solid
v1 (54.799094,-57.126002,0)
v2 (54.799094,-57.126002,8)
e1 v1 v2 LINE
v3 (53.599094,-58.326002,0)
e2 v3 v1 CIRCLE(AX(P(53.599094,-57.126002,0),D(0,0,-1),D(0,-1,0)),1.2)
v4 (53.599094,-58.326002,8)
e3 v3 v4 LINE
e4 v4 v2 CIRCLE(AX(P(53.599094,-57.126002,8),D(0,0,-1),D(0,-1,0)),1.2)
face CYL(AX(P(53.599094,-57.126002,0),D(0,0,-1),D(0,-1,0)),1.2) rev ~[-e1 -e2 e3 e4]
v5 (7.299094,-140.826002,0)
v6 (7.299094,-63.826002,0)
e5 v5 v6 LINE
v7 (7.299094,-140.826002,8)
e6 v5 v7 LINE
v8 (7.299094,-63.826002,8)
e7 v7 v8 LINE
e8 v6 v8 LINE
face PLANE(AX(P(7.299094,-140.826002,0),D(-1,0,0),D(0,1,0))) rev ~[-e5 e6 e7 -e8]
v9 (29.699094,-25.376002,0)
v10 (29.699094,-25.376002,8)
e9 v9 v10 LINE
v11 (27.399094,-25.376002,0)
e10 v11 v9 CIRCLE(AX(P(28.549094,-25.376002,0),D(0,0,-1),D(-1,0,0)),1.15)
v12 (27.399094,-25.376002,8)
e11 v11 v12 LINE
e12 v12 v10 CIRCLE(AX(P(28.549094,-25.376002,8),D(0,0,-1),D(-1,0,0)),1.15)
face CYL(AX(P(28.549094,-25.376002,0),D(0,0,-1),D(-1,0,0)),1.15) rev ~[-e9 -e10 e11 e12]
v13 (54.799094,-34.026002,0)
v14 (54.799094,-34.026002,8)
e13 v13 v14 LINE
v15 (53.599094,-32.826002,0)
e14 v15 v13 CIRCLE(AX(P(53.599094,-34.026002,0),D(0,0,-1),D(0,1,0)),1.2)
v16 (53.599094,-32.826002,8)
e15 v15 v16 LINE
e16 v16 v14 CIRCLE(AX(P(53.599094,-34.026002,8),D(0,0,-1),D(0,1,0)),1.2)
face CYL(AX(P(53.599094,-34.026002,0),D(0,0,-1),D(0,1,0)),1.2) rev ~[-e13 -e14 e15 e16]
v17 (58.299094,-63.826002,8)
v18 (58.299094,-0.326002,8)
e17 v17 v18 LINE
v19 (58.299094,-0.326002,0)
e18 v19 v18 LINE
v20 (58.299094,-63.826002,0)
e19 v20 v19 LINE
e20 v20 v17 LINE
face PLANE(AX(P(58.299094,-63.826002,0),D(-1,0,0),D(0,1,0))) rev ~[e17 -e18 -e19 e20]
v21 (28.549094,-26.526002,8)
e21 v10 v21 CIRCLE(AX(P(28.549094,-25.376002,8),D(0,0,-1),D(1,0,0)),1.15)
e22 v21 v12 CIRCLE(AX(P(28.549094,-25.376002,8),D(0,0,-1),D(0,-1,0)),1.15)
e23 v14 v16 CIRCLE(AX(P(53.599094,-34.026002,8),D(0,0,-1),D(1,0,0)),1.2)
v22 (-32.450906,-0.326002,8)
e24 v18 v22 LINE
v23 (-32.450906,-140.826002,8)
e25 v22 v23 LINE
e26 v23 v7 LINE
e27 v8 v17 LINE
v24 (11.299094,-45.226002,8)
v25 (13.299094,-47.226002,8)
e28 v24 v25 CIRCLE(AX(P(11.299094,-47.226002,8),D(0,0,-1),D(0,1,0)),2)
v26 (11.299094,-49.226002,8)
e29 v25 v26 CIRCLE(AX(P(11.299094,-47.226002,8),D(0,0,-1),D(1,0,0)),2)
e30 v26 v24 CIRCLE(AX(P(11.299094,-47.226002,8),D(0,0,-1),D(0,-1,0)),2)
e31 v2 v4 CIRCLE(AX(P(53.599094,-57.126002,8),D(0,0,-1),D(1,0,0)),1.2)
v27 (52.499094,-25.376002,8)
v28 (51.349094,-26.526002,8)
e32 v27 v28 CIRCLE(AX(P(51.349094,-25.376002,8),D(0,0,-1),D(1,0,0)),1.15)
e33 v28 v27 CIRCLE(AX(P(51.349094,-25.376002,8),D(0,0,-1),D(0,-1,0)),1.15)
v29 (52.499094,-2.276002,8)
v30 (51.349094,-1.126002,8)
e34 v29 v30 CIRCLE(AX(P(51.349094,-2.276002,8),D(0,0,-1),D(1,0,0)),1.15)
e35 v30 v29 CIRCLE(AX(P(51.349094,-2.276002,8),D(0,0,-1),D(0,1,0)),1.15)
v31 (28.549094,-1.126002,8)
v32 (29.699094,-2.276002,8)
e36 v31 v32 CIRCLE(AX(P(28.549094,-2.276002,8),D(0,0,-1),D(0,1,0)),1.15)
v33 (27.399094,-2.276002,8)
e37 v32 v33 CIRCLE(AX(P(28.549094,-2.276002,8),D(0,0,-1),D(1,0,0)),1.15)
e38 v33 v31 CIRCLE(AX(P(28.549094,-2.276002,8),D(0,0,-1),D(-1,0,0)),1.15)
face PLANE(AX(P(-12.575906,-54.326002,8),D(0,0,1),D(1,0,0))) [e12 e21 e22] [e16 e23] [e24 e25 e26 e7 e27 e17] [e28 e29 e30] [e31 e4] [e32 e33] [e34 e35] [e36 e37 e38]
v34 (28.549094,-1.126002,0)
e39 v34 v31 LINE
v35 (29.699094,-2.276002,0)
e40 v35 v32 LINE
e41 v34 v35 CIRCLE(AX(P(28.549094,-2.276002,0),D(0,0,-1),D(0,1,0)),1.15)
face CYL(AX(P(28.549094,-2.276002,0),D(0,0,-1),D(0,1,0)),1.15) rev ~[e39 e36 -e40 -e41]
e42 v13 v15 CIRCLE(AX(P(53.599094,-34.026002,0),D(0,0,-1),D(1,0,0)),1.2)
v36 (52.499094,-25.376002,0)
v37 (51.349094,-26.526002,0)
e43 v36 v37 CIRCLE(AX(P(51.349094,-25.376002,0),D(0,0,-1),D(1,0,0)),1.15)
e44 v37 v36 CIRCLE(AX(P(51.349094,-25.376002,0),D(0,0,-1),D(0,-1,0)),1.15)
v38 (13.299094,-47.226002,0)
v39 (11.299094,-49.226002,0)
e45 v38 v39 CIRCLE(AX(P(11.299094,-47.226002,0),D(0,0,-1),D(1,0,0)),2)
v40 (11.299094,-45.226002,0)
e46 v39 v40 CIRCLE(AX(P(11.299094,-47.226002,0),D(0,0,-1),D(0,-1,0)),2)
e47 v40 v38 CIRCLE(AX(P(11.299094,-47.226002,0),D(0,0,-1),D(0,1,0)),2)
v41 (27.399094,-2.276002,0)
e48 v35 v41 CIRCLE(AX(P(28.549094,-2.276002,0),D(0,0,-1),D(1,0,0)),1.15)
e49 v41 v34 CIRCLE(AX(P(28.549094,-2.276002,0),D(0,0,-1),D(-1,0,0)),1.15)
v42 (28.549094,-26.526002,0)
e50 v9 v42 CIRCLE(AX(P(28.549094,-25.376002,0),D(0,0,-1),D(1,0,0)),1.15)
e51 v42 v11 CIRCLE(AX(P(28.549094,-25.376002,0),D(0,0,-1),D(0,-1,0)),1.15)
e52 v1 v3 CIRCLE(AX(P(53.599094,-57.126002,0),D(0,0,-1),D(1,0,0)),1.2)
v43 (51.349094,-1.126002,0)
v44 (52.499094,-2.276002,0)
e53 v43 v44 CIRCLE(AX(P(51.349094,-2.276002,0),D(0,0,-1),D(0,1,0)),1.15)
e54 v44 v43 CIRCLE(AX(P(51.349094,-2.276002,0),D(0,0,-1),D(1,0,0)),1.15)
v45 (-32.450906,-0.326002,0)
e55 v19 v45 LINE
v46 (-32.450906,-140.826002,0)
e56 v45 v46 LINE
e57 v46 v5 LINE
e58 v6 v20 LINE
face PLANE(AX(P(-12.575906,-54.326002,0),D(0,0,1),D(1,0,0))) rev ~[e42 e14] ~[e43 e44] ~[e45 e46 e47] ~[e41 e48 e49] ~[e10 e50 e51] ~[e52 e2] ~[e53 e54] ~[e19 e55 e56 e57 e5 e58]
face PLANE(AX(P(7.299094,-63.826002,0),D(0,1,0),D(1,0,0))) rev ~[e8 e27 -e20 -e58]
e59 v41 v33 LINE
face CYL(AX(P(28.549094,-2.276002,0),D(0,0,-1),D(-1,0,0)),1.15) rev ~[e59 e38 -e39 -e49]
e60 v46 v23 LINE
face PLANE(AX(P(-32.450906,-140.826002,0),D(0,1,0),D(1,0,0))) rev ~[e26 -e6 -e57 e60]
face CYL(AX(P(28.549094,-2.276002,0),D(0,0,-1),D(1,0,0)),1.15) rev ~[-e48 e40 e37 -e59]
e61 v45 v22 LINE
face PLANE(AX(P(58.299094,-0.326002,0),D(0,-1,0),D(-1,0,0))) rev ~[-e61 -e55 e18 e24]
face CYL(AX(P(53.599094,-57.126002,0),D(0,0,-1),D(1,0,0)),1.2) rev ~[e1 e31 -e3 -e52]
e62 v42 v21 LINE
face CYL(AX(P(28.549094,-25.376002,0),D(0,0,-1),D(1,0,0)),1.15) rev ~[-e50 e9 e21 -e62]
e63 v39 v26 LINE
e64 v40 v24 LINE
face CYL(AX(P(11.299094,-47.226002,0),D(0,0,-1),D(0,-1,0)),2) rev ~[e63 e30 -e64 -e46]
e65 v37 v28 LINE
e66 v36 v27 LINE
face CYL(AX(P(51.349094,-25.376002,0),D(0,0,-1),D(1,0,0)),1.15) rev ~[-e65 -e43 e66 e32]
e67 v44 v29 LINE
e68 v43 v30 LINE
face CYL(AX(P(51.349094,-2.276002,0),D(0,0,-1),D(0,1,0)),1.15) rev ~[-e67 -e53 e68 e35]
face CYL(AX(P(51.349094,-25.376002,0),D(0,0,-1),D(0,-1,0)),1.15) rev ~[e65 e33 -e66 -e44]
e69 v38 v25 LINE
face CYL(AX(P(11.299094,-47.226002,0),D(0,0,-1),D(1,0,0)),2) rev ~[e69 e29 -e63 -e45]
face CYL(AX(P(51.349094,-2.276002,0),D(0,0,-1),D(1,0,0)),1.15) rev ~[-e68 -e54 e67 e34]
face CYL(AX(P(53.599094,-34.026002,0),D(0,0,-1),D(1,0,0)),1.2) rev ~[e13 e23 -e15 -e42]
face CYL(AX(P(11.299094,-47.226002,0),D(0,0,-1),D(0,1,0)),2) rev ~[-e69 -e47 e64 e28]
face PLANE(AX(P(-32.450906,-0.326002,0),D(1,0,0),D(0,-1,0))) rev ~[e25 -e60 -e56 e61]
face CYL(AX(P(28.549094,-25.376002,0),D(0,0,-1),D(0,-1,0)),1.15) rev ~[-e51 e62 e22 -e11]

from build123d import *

# Parameters (mm, degrees)
F0_W     = 39.75
F0_H     = 5
F0_W_2   = 4
F0_H_2   = 9
F0_H_3   = 77
F0_W_3   = 3
F0_H_4   = 26.5
F0_H_5   = 1.95
F0_W_4   = 5
F0_H_6   = 17
F0_H_7   = 23.1
F1_DEPTH = 8


with BuildPart() as f1:
    # F0 (on Top) → F1 (new body)
    with BuildSketch(Plane.XY):
        Polygon((-32.4509056807, -49.8260023594), (-32.4509056807, -58.8260023594), (7.2990943193, -58.8260023594), (7.2990943193, -49.8260023594), (-26.0348562151, -49.8260023594), align=None)
        with Locations((-12.5759056807, -61.3260023594)):
            Rectangle(F0_W, F0_H)
        with Locations((9.2990943193, -54.3260023594)):
            Rectangle(F0_W_2, F0_H_2)
        Polygon((11.2990943193, -58.8260023594), (7.2990943193, -58.8260023594), (7.2990943193, -63.8260023594), (14.2990943193, -63.8260023594), (19.2990943193, -63.8260023594), (58.2990943193, -63.8260023594), (58.2990943193, -22.3260023594), (53.2990943193, -22.3260023594), (53.2990943193, -25.3760023594), (53.2990943193, -27.3260023594), (51.3490943193, -27.3260023594), (28.5490943193, -27.3260023594), (23.2990943193, -27.3260023594), (23.2990943193, -32.3260023594), (53.5990943193, -32.3260023594), (55.2990943193, -32.3260023594), (55.2990943193, -34.0260023594), (55.2990943193, -57.1260023594), (55.2990943193, -58.8260023594), (53.5990943193, -58.8260023594), (23.2990943193, -58.8260023594), (19.2990943193, -58.8260023594), (14.2990943193, -58.8260023594), align=None)
        with BuildLine():
            Line((-32.4509056807, -0.3260023594), (-32.4509056807, -49.8260023594))
            Line((-32.4509056807, -49.8260023594), (-26.0348562151, -49.8260023594))
            Line((-26.0348562151, -49.8260023594), (7.2990943193, -49.8260023594))
            Line((7.2990943193, -49.8260023594), (11.2990943193, -49.8260023594))
            Line((11.2990943193, -49.8260023594), (11.2990943193, -49.2260023594))
            ThreePointArc((11.2990943193, -49.2260023594), (9.2990943193, -47.2260023594), (11.2990943193, -45.2260023594))
            Line((11.2990943193, -45.2260023594), (11.2990943193, -0.3260023594))
            Line((11.2990943193, -0.3260023594), (-32.4509056807, -0.3260023594))
        make_face()
        with Locations((-12.5759056807, -102.3260023594)):
            Rectangle(F0_W, F0_H_3)
        with Locations((12.7990943193, -54.3260023594)):
            Rectangle(F0_W_3, F0_H_2)
        Polygon((14.2990943193, -49.8260023594), (14.2990943193, -58.8260023594), (19.2990943193, -58.8260023594), (19.2990943193, -32.3260023594), (23.2990943193, -32.3260023594), (23.2990943193, -27.3260023594), (19.2990943193, -27.3260023594), (19.2990943193, -25.3760023594), (19.2990943193, -2.2760023594), (19.2990943193, -0.3260023594), (14.2990943193, -0.3260023594), (14.2990943193, -27.3260023594), (14.2990943193, -32.3260023594), (14.2990943193, -47.2260023594), align=None)
        with BuildLine():
            Line((11.2990943193, -49.2260023594), (11.2990943193, -49.8260023594))
            Line((11.2990943193, -49.8260023594), (14.2990943193, -49.8260023594))
            Line((14.2990943193, -49.8260023594), (14.2990943193, -47.2260023594))
            Line((14.2990943193, -47.2260023594), (13.2990943193, -47.2260023594))
            ThreePointArc((13.2990943193, -47.2260023594), (12.7133078817, -48.6402159218), (11.2990943193, -49.2260023594))
        make_face()
        with BuildLine():
            Line((14.2990943193, -0.3260023594), (11.2990943193, -0.3260023594))
            Line((11.2990943193, -0.3260023594), (11.2990943193, -45.2260023594))
            ThreePointArc((11.2990943193, -45.2260023594), (12.7133078817, -45.811788797), (13.2990943193, -47.2260023594))
            Line((13.2990943193, -47.2260023594), (14.2990943193, -47.2260023594))
            Line((14.2990943193, -47.2260023594), (14.2990943193, -32.3260023594))
            Line((14.2990943193, -32.3260023594), (14.2990943193, -27.3260023594))
            Line((14.2990943193, -27.3260023594), (14.2990943193, -0.3260023594))
        make_face()
        with Locations((21.2990943193, -45.5760023594)):
            Rectangle(F0_W_2, F0_H_4)
        with BuildLine():
            Line((23.2990943193, -32.3260023594), (23.2990943193, -58.8260023594))
            Line((23.2990943193, -58.8260023594), (53.5990943193, -58.8260023594))
            Line((53.5990943193, -58.8260023594), (53.5990943193, -58.3260023594))
            ThreePointArc((53.5990943193, -58.3260023594), (52.7505661819, -56.277474222), (54.7990943193, -57.1260023594))
            Line((54.7990943193, -57.1260023594), (55.2990943193, -57.1260023594))
            Line((55.2990943193, -57.1260023594), (55.2990943193, -34.0260023594))
            Line((55.2990943193, -34.0260023594), (54.7990943193, -34.0260023594))
            ThreePointArc((54.7990943193, -34.0260023594), (52.7505661819, -34.8745304968), (53.5990943193, -32.8260023594))
            Line((53.5990943193, -32.8260023594), (53.5990943193, -32.3260023594))
            Line((53.5990943193, -32.3260023594), (23.2990943193, -32.3260023594))
        make_face()
        with Locations((21.2990943193, -1.3010023594)):
            Rectangle(F0_W_2, F0_H_5)
        with BuildLine():
            Line((53.5990943193, -58.3260023594), (53.5990943193, -58.8260023594))
            Line((53.5990943193, -58.8260023594), (55.2990943193, -58.8260023594))
            Line((55.2990943193, -58.8260023594), (55.2990943193, -57.1260023594))
            Line((55.2990943193, -57.1260023594), (54.7990943193, -57.1260023594))
            ThreePointArc((54.7990943193, -57.1260023594), (54.4476224568, -57.9745304968), (53.5990943193, -58.3260023594))
        make_face()
        with Locations((55.7990943193, -13.8260023594)):
            Rectangle(F0_W_4, F0_H_6)
        with BuildLine():
            Line((28.5490943193, -0.3260023594), (23.2990943193, -0.3260023594))
            Line((23.2990943193, -0.3260023594), (23.2990943193, -2.2760023594))
            Line((23.2990943193, -2.2760023594), (27.3990943193, -2.2760023594))
            ThreePointArc((27.3990943193, -2.2760023594), (27.735921521, -1.462829561), (28.5490943193, -1.1260023594))
            Line((28.5490943193, -1.1260023594), (28.5490943193, -0.3260023594))
        make_face()
        with Locations((21.2990943193, -13.8260023594)):
            Rectangle(F0_W_2, F0_H_7)
        with BuildLine():
            Line((55.2990943193, -32.3260023594), (53.5990943193, -32.3260023594))
            Line((53.5990943193, -32.3260023594), (53.5990943193, -32.8260023594))
            ThreePointArc((53.5990943193, -32.8260023594), (54.4476224568, -33.177474222), (54.7990943193, -34.0260023594))
            Line((54.7990943193, -34.0260023594), (55.2990943193, -34.0260023594))
            Line((55.2990943193, -34.0260023594), (55.2990943193, -32.3260023594))
        make_face()
        with BuildLine():
            Line((23.2990943193, -25.3760023594), (23.2990943193, -27.3260023594))
            Line((23.2990943193, -27.3260023594), (28.5490943193, -27.3260023594))
            Line((28.5490943193, -27.3260023594), (28.5490943193, -26.5260023594))
            ThreePointArc((28.5490943193, -26.5260023594), (27.735921521, -26.1891751578), (27.3990943193, -25.3760023594))
            Line((27.3990943193, -25.3760023594), (23.2990943193, -25.3760023594))
        make_face()
        with Locations((21.2990943193, -26.3510023594)):
            Rectangle(F0_W_2, F0_H_5)
        with BuildLine():
            Line((53.2990943193, -25.3760023594), (53.2990943193, -22.3260023594))
            Line((53.2990943193, -22.3260023594), (53.2990943193, -5.3260023594))
            Line((53.2990943193, -5.3260023594), (53.2990943193, -2.2760023594))
            Line((53.2990943193, -2.2760023594), (52.4990943193, -2.2760023594))
            ThreePointArc((52.4990943193, -2.2760023594), (50.535921521, -3.0891751578), (51.3490943193, -1.1260023594))
            Line((51.3490943193, -1.1260023594), (51.3490943193, -0.3260023594))
            Line((51.3490943193, -0.3260023594), (28.5490943193, -0.3260023594))
            Line((28.5490943193, -0.3260023594), (28.5490943193, -1.1260023594))
            ThreePointArc((28.5490943193, -1.1260023594), (29.3622671177, -1.462829561), (29.6990943193, -2.2760023594))
            ThreePointArc((29.6990943193, -2.2760023594), (28.5490943193, -3.4260023594), (27.3990943193, -2.2760023594))
            Line((27.3990943193, -2.2760023594), (23.2990943193, -2.2760023594))
            Line((23.2990943193, -2.2760023594), (23.2990943193, -25.3760023594))
            Line((23.2990943193, -25.3760023594), (27.3990943193, -25.3760023594))
            ThreePointArc((27.3990943193, -25.3760023594), (28.5490943193, -24.2260023594), (29.6990943193, -25.3760023594))
            ThreePointArc((29.6990943193, -25.3760023594), (29.3622671177, -26.1891751578), (28.5490943193, -26.5260023594))
            Line((28.5490943193, -26.5260023594), (28.5490943193, -27.3260023594))
            Line((28.5490943193, -27.3260023594), (51.3490943193, -27.3260023594))
            Line((51.3490943193, -27.3260023594), (51.3490943193, -26.5260023594))
            ThreePointArc((51.3490943193, -26.5260023594), (50.535921521, -24.562829561), (52.4990943193, -25.3760023594))
            Line((52.4990943193, -25.3760023594), (53.2990943193, -25.3760023594))
        make_face()
        Polygon((53.2990943193, -5.3260023594), (58.2990943193, -5.3260023594), (58.2990943193, -0.3260023594), (53.2990943193, -0.3260023594), (53.2990943193, -2.2760023594), align=None)
        with BuildLine():
            Line((53.2990943193, -27.3260023594), (53.2990943193, -25.3760023594))
            Line((53.2990943193, -25.3760023594), (52.4990943193, -25.3760023594))
            ThreePointArc((52.4990943193, -25.3760023594), (52.1622671177, -26.1891751578), (51.3490943193, -26.5260023594))
            Line((51.3490943193, -26.5260023594), (51.3490943193, -27.3260023594))
            Line((51.3490943193, -27.3260023594), (53.2990943193, -27.3260023594))
        make_face()
        with BuildLine():
            Line((53.2990943193, -0.3260023594), (51.3490943193, -0.3260023594))
            Line((51.3490943193, -0.3260023594), (51.3490943193, -1.1260023594))
            ThreePointArc((51.3490943193, -1.1260023594), (52.1622671177, -1.462829561), (52.4990943193, -2.2760023594))
            Line((52.4990943193, -2.2760023594), (53.2990943193, -2.2760023594))
            Line((53.2990943193, -2.2760023594), (53.2990943193, -0.3260023594))
        make_face()
    extrude(amount=F1_DEPTH)


solid = f1.part
